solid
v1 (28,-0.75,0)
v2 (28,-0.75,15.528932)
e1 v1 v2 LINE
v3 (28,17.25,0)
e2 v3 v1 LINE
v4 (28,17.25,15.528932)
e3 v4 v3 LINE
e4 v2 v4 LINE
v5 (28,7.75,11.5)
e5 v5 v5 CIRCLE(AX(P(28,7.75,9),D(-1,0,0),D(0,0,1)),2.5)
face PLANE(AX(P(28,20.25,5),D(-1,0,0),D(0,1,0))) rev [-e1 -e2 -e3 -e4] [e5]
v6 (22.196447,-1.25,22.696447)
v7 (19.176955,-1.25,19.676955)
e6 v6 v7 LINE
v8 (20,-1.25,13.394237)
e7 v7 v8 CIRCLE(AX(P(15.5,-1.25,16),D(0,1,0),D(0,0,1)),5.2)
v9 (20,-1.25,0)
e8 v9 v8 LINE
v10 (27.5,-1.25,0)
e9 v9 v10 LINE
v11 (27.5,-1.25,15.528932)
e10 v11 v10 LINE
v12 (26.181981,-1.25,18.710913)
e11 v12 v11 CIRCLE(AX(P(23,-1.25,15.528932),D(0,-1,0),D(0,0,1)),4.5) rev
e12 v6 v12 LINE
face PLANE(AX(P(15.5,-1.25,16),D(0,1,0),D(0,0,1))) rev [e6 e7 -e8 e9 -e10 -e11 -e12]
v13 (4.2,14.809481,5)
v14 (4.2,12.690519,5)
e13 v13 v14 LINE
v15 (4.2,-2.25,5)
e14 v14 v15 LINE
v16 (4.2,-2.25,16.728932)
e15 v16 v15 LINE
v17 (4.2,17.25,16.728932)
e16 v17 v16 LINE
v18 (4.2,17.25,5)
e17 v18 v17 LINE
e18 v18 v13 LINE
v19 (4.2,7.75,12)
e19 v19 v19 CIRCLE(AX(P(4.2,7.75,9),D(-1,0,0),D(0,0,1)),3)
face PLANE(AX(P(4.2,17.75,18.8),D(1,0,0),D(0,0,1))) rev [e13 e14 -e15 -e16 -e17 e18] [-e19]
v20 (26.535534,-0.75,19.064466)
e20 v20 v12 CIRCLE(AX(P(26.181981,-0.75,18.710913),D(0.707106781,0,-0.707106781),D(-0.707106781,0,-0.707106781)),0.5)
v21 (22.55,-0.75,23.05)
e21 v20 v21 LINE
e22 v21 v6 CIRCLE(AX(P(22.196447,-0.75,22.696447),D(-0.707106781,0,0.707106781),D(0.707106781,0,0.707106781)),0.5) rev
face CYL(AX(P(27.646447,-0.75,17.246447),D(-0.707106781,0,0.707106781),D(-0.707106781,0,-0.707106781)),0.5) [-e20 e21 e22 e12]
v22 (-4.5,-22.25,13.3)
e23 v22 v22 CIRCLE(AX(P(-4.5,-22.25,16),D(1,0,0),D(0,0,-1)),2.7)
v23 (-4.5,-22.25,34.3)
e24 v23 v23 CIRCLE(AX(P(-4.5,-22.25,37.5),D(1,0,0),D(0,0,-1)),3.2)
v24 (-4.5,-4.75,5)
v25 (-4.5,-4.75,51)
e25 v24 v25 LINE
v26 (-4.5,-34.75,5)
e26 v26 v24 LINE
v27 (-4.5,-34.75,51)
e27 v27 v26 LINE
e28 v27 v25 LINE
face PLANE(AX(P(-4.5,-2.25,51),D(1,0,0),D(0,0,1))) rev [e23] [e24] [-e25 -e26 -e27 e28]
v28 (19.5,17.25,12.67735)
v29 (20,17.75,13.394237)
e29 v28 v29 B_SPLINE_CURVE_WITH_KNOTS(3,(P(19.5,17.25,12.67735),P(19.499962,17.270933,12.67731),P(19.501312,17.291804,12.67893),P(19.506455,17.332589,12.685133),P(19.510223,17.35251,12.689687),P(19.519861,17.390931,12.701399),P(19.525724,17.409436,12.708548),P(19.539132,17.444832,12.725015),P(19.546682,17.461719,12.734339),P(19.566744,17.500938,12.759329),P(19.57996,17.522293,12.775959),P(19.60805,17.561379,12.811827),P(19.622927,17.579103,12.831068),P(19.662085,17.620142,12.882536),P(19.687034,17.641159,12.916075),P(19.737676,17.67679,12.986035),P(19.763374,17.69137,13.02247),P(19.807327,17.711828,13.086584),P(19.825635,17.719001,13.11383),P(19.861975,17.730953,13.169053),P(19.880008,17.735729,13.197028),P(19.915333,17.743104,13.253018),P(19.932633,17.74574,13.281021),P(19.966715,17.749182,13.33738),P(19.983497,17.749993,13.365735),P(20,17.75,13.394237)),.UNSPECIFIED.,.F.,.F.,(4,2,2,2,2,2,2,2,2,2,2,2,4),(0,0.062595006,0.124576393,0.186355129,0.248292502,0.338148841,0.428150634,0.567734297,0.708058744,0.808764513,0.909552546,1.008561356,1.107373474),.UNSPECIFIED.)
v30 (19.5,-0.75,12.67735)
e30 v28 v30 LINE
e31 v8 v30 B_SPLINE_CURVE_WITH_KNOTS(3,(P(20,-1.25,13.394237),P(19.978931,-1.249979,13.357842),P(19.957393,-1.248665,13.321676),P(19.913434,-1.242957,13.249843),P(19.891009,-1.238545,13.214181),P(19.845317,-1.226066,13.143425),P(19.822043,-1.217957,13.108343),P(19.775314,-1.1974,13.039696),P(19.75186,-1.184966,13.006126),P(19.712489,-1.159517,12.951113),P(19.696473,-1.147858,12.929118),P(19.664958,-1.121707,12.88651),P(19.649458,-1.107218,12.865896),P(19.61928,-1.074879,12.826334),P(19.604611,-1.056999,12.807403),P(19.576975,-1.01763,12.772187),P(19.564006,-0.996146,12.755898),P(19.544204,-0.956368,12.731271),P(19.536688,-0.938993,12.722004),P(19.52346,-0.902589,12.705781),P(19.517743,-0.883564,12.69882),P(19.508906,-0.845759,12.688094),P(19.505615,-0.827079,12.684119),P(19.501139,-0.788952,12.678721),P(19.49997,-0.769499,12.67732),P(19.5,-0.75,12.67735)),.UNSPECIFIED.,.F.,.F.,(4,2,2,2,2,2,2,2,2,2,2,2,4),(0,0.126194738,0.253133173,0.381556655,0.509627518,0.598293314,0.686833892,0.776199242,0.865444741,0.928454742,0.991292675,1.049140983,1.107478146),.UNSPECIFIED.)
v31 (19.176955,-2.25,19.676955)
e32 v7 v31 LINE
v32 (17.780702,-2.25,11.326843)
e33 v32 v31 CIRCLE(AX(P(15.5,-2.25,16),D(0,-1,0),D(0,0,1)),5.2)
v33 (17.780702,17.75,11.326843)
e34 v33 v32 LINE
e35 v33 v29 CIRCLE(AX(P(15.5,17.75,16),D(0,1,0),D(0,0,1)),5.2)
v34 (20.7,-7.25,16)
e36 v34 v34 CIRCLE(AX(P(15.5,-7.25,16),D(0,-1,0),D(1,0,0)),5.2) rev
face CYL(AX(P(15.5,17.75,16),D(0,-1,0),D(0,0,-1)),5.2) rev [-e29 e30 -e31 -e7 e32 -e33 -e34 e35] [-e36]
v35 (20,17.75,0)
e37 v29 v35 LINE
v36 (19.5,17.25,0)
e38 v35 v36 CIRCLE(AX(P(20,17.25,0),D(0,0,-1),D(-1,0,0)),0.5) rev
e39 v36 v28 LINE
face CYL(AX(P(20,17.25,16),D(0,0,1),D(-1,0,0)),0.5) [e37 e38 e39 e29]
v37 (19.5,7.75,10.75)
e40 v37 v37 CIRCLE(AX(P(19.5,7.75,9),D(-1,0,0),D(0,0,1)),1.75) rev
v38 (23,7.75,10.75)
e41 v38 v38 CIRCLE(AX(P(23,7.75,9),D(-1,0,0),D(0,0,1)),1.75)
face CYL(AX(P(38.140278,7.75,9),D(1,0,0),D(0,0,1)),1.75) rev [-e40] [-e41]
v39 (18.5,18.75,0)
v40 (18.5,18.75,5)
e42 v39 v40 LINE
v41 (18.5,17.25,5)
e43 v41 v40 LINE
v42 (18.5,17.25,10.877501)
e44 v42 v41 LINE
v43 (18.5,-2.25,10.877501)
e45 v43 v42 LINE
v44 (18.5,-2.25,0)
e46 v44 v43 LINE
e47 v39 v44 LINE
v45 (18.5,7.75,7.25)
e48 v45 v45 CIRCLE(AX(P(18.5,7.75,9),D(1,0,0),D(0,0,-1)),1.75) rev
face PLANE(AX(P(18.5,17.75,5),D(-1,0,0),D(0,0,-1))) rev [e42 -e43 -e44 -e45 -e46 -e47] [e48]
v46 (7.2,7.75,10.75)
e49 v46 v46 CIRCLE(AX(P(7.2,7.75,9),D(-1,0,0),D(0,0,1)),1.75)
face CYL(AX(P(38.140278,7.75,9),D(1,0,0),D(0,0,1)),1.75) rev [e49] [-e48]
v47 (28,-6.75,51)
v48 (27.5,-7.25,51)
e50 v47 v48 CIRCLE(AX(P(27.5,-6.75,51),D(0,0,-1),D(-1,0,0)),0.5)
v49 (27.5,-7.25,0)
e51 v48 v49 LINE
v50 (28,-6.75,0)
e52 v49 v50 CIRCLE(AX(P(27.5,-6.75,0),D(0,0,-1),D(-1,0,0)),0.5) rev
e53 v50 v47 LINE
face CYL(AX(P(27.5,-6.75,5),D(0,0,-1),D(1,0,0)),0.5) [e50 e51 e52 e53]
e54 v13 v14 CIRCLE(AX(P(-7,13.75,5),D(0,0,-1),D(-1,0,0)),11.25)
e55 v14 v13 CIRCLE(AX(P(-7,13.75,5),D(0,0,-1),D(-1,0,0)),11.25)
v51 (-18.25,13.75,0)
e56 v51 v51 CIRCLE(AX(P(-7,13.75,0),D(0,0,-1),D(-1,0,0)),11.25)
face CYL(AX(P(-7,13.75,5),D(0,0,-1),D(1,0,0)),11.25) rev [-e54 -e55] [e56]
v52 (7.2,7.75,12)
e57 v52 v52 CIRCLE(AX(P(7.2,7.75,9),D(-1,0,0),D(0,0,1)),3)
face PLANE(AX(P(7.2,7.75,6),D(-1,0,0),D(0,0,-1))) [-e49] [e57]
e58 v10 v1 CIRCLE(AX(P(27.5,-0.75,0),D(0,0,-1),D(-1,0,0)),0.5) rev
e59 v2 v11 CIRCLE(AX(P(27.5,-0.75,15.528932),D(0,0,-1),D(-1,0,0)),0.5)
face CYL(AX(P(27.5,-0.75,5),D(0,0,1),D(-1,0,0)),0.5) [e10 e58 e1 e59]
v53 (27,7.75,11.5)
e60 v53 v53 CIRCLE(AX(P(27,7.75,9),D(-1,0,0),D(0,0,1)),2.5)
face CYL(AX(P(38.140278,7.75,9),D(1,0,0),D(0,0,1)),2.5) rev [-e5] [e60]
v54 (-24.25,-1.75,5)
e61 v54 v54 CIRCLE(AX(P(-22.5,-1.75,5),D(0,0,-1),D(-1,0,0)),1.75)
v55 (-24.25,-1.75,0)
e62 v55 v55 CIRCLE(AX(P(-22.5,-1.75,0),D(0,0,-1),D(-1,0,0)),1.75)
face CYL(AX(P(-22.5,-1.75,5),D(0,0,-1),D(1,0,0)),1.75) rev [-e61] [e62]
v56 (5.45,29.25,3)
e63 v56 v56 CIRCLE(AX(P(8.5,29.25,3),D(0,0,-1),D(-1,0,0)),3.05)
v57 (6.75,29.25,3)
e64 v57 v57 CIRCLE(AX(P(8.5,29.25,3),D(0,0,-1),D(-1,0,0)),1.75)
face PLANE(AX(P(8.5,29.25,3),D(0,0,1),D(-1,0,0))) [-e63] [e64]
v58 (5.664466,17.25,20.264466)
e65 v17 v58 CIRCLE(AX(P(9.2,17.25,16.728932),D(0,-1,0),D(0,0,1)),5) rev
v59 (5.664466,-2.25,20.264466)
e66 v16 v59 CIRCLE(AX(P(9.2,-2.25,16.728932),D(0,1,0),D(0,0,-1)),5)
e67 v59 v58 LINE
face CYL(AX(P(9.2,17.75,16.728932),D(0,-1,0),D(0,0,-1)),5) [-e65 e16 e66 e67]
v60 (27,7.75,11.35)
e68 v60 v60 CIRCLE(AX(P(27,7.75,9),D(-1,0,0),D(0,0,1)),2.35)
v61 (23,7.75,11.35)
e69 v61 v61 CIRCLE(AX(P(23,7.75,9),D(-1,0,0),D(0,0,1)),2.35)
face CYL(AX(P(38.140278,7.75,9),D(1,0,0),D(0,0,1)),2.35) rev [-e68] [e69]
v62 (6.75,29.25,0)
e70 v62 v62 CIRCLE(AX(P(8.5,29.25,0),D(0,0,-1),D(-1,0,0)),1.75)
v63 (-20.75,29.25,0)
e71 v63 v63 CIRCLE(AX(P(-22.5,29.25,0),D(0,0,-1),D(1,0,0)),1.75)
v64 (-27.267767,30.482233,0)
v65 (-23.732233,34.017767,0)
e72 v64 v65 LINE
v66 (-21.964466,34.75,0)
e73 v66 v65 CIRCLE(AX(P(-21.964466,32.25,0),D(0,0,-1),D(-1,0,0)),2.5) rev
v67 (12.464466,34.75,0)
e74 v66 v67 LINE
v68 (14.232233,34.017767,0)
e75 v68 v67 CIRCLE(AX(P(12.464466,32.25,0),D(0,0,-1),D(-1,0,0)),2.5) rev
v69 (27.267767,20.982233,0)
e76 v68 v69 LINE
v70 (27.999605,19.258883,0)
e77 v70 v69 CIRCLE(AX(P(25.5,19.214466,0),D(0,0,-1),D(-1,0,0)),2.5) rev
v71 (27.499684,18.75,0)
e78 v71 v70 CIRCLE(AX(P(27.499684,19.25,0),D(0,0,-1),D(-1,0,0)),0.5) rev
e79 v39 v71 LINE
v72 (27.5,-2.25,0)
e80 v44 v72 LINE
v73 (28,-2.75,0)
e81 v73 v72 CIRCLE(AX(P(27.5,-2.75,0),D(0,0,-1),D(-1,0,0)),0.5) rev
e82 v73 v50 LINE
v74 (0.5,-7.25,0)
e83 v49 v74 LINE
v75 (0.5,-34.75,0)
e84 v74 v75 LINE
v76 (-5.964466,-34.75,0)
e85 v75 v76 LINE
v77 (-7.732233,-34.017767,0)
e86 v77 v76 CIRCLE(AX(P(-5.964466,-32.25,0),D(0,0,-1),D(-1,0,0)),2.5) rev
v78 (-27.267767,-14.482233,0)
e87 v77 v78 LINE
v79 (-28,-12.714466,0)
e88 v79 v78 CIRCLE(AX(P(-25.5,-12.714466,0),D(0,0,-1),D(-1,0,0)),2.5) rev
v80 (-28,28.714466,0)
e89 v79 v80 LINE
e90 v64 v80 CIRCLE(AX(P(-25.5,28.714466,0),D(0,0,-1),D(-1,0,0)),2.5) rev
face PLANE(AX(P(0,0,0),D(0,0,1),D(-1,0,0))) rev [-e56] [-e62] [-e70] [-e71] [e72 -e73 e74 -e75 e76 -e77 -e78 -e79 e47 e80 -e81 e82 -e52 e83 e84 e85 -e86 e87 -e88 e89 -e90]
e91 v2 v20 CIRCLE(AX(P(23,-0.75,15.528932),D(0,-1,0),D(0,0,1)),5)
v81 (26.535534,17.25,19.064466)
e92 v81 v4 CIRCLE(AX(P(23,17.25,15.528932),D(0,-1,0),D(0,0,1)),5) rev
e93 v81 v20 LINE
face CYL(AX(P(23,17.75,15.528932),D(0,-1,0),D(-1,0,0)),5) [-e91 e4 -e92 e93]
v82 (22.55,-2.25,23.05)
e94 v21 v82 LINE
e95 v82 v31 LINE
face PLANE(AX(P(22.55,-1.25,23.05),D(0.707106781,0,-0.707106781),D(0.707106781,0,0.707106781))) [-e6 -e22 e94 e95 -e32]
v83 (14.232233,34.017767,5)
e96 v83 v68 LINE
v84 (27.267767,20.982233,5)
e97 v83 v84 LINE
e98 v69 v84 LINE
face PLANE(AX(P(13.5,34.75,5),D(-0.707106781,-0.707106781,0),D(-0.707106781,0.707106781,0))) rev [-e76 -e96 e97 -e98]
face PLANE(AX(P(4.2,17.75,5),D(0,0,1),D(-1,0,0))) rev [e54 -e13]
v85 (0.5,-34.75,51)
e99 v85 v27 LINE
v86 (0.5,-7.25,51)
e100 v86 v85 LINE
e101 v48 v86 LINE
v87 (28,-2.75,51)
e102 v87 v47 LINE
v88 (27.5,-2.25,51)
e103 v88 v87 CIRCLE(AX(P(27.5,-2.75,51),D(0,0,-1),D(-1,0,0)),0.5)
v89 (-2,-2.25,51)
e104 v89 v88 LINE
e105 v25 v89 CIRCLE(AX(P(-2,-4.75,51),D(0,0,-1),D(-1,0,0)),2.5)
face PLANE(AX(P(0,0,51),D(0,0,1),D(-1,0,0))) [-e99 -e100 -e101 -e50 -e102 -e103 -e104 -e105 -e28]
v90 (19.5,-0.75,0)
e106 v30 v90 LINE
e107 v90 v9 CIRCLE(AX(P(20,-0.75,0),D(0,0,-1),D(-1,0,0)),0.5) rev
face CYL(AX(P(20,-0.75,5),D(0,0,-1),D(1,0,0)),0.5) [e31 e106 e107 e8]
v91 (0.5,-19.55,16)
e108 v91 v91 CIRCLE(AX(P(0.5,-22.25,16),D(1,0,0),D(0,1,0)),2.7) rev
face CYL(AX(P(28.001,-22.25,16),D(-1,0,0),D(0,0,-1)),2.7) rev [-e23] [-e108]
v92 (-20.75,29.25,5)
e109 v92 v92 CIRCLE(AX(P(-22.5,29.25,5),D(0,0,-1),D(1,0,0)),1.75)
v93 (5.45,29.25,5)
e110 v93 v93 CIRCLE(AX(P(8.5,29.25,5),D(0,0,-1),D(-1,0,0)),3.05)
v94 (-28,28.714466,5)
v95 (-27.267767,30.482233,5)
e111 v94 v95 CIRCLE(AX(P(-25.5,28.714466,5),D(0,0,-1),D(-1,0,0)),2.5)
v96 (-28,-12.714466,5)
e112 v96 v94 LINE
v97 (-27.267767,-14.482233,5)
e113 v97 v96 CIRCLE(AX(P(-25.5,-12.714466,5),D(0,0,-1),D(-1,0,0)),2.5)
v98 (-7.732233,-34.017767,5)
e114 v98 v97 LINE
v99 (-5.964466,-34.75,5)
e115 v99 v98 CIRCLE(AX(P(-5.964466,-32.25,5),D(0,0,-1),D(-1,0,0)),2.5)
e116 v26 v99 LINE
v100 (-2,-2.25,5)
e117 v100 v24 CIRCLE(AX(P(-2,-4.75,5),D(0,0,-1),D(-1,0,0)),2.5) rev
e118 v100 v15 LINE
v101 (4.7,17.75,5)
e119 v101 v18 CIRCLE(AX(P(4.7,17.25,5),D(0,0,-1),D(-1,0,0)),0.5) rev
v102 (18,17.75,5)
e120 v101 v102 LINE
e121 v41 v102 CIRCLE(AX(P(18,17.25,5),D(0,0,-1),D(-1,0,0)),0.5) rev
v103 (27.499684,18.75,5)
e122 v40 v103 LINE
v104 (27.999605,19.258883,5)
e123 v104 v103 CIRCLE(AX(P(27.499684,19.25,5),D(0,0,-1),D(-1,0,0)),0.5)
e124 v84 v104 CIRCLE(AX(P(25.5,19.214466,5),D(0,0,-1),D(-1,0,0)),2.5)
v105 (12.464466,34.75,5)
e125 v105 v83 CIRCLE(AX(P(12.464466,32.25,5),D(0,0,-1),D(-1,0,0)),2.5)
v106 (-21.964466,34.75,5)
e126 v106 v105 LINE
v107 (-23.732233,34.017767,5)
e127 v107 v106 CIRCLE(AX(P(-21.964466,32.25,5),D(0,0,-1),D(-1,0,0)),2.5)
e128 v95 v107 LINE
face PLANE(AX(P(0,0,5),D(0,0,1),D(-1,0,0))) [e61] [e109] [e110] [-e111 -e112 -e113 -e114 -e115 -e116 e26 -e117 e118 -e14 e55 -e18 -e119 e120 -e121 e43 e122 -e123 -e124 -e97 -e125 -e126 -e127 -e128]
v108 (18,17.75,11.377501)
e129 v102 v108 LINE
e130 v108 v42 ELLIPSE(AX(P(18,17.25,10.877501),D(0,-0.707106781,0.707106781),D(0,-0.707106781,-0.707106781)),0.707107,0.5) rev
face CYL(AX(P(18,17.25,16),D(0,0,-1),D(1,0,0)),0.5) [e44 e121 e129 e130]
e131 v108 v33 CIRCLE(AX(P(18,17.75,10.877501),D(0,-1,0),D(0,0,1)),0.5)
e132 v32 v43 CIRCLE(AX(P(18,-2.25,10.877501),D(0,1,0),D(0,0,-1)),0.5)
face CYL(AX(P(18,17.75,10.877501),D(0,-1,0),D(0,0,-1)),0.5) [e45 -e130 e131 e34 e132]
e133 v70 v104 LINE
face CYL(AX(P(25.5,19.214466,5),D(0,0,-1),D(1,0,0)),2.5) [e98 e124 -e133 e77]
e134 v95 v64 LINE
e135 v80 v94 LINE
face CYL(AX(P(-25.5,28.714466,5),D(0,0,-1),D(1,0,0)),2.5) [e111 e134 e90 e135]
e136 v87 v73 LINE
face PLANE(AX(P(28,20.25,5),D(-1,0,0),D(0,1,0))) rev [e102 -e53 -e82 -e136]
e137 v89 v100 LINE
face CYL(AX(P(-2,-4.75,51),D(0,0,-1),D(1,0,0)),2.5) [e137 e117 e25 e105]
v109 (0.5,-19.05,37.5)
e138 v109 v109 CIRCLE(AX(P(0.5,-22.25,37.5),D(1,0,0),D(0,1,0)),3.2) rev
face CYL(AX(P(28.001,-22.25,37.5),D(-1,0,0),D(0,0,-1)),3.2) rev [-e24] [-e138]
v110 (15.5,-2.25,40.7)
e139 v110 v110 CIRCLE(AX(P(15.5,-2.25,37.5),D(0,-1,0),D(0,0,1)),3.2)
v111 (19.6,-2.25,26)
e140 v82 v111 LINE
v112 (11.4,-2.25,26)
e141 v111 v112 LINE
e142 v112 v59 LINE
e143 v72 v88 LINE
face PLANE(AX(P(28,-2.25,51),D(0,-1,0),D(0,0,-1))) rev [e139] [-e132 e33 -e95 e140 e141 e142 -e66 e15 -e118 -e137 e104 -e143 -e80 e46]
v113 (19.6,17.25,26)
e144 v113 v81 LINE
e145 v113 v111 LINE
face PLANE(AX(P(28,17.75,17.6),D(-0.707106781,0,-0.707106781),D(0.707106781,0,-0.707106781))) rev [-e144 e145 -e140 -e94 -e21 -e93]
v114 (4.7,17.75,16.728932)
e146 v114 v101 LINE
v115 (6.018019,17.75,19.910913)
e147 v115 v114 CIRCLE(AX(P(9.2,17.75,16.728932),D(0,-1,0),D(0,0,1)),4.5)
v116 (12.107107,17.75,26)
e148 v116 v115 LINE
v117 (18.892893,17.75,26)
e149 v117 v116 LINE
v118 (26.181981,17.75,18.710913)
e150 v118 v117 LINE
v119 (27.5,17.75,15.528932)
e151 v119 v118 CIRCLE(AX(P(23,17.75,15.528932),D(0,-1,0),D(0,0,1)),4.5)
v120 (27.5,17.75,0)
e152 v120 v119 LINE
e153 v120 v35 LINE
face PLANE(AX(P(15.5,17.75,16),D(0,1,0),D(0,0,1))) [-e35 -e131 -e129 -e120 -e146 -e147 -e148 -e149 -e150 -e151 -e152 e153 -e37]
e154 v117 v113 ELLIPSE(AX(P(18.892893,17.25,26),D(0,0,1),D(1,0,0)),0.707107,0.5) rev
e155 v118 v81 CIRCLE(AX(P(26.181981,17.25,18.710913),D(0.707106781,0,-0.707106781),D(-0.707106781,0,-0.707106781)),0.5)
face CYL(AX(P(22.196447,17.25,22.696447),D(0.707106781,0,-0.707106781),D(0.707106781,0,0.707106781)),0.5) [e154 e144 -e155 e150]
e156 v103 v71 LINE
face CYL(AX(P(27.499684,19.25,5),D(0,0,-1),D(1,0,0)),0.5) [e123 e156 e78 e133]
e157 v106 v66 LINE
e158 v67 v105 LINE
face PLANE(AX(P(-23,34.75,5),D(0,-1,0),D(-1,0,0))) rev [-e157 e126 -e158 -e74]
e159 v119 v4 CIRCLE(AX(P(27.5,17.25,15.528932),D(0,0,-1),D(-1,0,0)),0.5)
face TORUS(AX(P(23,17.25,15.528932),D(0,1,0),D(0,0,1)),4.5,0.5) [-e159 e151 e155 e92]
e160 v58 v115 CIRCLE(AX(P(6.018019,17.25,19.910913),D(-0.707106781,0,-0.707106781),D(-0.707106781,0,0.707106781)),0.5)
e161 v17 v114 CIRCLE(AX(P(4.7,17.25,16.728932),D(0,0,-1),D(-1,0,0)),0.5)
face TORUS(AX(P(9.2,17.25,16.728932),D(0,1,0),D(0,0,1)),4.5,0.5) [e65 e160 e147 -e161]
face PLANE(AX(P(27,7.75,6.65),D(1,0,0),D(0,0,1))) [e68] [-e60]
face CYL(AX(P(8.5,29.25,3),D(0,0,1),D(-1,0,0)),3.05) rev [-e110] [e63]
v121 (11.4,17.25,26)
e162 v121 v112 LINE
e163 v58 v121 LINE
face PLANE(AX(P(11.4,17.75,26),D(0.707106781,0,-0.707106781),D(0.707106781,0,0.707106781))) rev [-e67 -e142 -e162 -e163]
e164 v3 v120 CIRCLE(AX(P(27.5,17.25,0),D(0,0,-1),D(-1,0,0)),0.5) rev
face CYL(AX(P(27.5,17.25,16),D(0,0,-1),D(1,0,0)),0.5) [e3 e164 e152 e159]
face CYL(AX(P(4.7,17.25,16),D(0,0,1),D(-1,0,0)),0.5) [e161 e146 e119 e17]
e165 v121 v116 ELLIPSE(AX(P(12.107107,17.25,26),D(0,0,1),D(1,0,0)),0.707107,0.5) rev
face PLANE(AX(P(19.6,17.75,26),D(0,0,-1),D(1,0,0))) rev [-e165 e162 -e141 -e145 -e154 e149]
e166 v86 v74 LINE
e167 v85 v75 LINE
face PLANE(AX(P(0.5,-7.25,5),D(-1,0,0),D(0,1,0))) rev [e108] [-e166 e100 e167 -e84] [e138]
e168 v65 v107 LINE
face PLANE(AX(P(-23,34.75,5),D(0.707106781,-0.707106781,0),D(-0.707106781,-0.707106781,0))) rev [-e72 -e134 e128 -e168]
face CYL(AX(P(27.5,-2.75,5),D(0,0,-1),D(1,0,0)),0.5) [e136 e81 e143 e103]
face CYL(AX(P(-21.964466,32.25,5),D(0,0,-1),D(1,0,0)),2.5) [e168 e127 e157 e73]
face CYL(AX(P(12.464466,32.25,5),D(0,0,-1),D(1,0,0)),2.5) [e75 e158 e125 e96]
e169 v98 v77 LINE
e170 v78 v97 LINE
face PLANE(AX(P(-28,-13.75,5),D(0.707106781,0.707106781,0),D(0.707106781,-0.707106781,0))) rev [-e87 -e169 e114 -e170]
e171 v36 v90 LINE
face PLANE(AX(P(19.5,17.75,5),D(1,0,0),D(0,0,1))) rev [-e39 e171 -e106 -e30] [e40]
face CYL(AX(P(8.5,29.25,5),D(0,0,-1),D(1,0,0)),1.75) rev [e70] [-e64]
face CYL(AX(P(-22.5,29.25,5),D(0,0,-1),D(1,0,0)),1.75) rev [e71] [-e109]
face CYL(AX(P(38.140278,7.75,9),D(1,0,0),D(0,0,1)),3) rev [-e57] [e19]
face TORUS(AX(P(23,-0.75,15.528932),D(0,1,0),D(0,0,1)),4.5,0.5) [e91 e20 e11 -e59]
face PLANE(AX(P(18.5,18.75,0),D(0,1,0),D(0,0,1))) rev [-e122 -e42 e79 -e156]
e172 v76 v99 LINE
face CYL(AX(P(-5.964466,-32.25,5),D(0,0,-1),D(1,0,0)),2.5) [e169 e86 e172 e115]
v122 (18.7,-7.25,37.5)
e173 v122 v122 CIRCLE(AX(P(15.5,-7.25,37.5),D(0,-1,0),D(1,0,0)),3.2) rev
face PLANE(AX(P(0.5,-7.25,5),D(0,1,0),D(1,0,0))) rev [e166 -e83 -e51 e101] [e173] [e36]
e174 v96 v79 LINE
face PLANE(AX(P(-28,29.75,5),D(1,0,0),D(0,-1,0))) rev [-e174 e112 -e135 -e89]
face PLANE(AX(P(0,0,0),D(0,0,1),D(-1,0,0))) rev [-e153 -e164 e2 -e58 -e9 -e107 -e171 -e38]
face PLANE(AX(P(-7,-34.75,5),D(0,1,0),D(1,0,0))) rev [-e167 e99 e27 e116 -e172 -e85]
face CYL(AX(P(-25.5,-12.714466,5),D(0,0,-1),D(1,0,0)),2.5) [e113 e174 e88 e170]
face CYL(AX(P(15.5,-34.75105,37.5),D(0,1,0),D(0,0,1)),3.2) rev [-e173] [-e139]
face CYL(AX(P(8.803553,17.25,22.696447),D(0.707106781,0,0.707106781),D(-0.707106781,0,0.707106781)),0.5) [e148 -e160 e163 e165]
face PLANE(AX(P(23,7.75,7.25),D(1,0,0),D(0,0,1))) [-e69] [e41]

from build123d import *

# Parameters (mm, degrees)
SKETCH1_R           = 11.25
SKETCH1_R_2         = 1.75
BOSS_EXTRUDE1_DEPTH = 5
BOSS_EXTRUDE2_DEPTH = 46
BOSS_EXTRUDE3_DEPTH = 20
CUT_EXTRUDE1_DEPTH  = 1
CUT_EXTRUDE2_DEPTH  = 65.090268372
CUT_EXTRUDE3_REACH  = 71.748
SKETCH6_R           = 2.7
SKETCH6_R_2         = 3.2
CUT_EXTRUDE4_REACH  = 70.949
SKETCH7_R           = 5.2
SKETCH7_R_2         = 3.2
SKETCH8_R           = 3.05
CUT_EXTRUDE5_DEPTH  = 2
FILLET1_R           = 2.5
FILLET2_R           = 5
FILLET3_R           = 0.5


with BuildPart() as part:
    # Sketch1 → Boss-Extrude1 (new body)
    with BuildSketch(Plane.XY):
        Polygon((-13.5, 34.75), (-28, 20.25), (-28, -7.25), (-0.5, -7.25), (-0.5, -34.75), (7, -34.75), (28, -13.75), (28, 29.75), (23, 34.75), align=None)
        with Locations((7, 13.75)):
            Circle(SKETCH1_R, mode=Mode.SUBTRACT)
        with Locations((-8.5, 29.25)):
            Circle(SKETCH1_R_2, mode=Mode.SUBTRACT)
        with Locations(Location((22.5, 29.25, 0), (0, 0, 180))):
            Circle(SKETCH1_R_2, mode=Mode.SUBTRACT)
        with Locations((22.5, -1.75)):
            Circle(SKETCH1_R_2, mode=Mode.SUBTRACT)
    extrude(amount=BOSS_EXTRUDE1_DEPTH)

    # Sketch2 → Boss-Extrude2 (add)
    with BuildSketch(Plane.XY.offset(5)):
        Polygon((-28, -7.25), (-0.5, -7.25), (-0.5, -34.75), (4.5, -34.75), (4.5, -2.25), (-28, -2.25), align=None)
    extrude(amount=BOSS_EXTRUDE2_DEPTH)

    # Sketch3 → Boss-Extrude3 (add)
    with BuildSketch(Plane(origin=(0, -2.25, 0), x_dir=(1, 0, 0), z_dir=(0, 1, 0))):
        with BuildLine():
            Line((-28, -5), (-28, -17.6))
            Line((-28, -17.6), (-19.6, -26))
            Line((-19.6, -26), (-11.4, -26))
            Line((-11.4, -26), (-4.2, -18.8))
            Line((-4.2, -18.8), (-4.2, -5))
            Line((-4.2, -5), (-18.5, -5))
            Line((-18.5, -5), (-18.5, -11.752647884))
            ThreePointArc((-18.5, -11.752647884), (-11.96959369, -19.81788309), (-19.5, -12.677350455))
            Line((-19.5, -12.677350455), (-19.5, -5))
            Line((-19.5, -5), (-28, -5))
        make_face()
    extrude(amount=BOSS_EXTRUDE3_DEPTH)

    # Sketch4 → Cut-Extrude1 (cut)
    with BuildSketch(Plane(origin=(0, -2.25, 0), x_dir=(1, 0, 0), z_dir=(0, 1, 0))):
        with BuildLine():
            Line((-28, -17.6), (-28, 0))
            Line((-28, 0), (-18.5, 0))
            Line((-18.5, 0), (-18.5, -11.752647884))
            ThreePointArc((-18.5, -11.752647884), (-20.681128714, -15.55738815), (-19.176955262, -19.676955262))
            Line((-19.176955262, -19.676955262), (-22.55, -23.05))
            Line((-22.55, -23.05), (-28, -17.6))
        make_face()
    extrude(amount=CUT_EXTRUDE1_DEPTH, mode=Mode.SUBTRACT)

    # Sketch5 → Cut-Extrude2 (cut, through all)
    with BuildSketch(Plane.XY.offset(5)):
        Polygon((-19.5, 17.75), (-28, 17.75), (-28, 18.75), (-18.5, 18.75), (-18.5, -1.25), (-19.5, -1.25), align=None)
    extrude(amount=-CUT_EXTRUDE2_DEPTH, mode=Mode.SUBTRACT)

    # Sketch6 → Cut-Extrude3 (cut, up to next)
    with BuildSketch(Plane(origin=(4.5, 0, 0), x_dir=(0, 0, -1), z_dir=(1, 0, 0)), mode=Mode.PRIVATE) as cut_extrude3_sk1:
        with Locations((-16, -22.25)):
            Circle(SKETCH6_R)
    cut_extrude3_tool1 = extrude(cut_extrude3_sk1.sketch, amount=-CUT_EXTRUDE3_REACH, mode=Mode.PRIVATE) & part.part
    # Sketch6 → Cut-Extrude3 (cut, up to next)
    with BuildSketch(Plane(origin=(4.5, 0, 0), x_dir=(0, 0, -1), z_dir=(1, 0, 0)), mode=Mode.PRIVATE) as cut_extrude3_sk2:
        with Locations((-37.5, -22.25)):
            Circle(SKETCH6_R_2)
    cut_extrude3_tool2 = extrude(cut_extrude3_sk2.sketch, amount=-CUT_EXTRUDE3_REACH, mode=Mode.PRIVATE) & part.part
    add(cut_extrude3_tool1.solids().sort_by_distance((4.5, -22.25, 16))[0], mode=Mode.SUBTRACT)
    add(cut_extrude3_tool2.solids().sort_by_distance((4.5, -22.25, 37.5))[0], mode=Mode.SUBTRACT)

    # Sketch7 → Cut-Extrude4 (cut, up to next)
    with BuildSketch(Plane(origin=(0, -2.25, 0), x_dir=(1, 0, 0), z_dir=(0, 1, 0)), mode=Mode.PRIVATE) as cut_extrude4_sk1:
        with Locations(Location((-15.5, -16, 0), (0, 0, 125.234417985))):
            Circle(SKETCH7_R)
    cut_extrude4_tool1 = extrude(cut_extrude4_sk1.sketch, amount=-CUT_EXTRUDE4_REACH, mode=Mode.PRIVATE) & part.part
    # Sketch7 → Cut-Extrude4 (cut, up to next)
    with BuildSketch(Plane(origin=(0, -2.25, 0), x_dir=(1, 0, 0), z_dir=(0, 1, 0)), mode=Mode.PRIVATE) as cut_extrude4_sk2:
        with Locations(Location((-15.5, -37.5, 0), (0, 0, 270))):
            Circle(SKETCH7_R_2)
    cut_extrude4_tool2 = extrude(cut_extrude4_sk2.sketch, amount=-CUT_EXTRUDE4_REACH, mode=Mode.PRIVATE) & part.part
    add(cut_extrude4_tool1.solids().sort_by_distance((-15.5, -2.25, 16))[0], mode=Mode.SUBTRACT)
    add(cut_extrude4_tool2.solids().sort_by_distance((-15.5, -2.25, 37.5))[0], mode=Mode.SUBTRACT)

    # Sketch8 → Cut-Extrude5 (cut)
    with BuildSketch(Plane.XY.offset(5)):
        with Locations((-8.5, 29.25)):
            Circle(SKETCH8_R)
    extrude(amount=-CUT_EXTRUDE5_DEPTH, mode=Mode.SUBTRACT)

    # Sketch9 → Cut-Revolve1 (revolve, cut)
    with BuildSketch(Plane(origin=(0, 7.75, 0), x_dir=(1, 0, 0), z_dir=(0, 1, 0)), mode=Mode.PRIVATE) as cut_revolve1_sk:
        Polygon((-4.2, -9), (-4.2, -6), (-7.2, -6), (-7.2, -7.25), (-23, -7.25), (-23, -6.65), (-27, -6.65), (-27, -6.5), (-28, -6.5), (-28, -9), align=None)
    revolve(cut_revolve1_sk.sketch.rotate(Axis((-38.14027768, 7.75, 9), (1, 0, 0)), 180), axis=Axis((-38.14027768, 7.75, 9), (1, 0, 0)), mode=Mode.SUBTRACT)

    # Fillet1
    fillet1_edges = [part.edges().sort_by_distance(p)[0] for p in [
        (4.5, -2.25, 28),
        (-28, 20.25, 2.5),
        (7, -34.75, 2.5),
        (28, -13.75, 2.5),
        (28, 29.75, 2.5),
        (23, 34.75, 2.5),
        (-13.5, 34.75, 2.5),
    ]]
    fillet(fillet1_edges, radius=FILLET1_R)

    # Fillet2
    fillet2_edges = [part.edges().sort_by_distance(p)[0] for p in [
        (-28, 8.25, 17.6),
        (-4.2, 7.75, 18.8),
    ]]
    fillet(fillet2_edges, radius=FILLET2_R)

    # Fillet3
    # the kernel refuses this fillet: 0.5 mm, written as the material it takes off along each edge
    with BuildSketch(Plane(origin=(-28, -1.25, 15.528932188), x_dir=(1, 0, 0), z_dir=(0, 0, -1)), Plane(origin=(-28, 17.75, -1.25), x_dir=(1, 0, 0), z_dir=(0, 0, 1))) as fillet3_piece_1:
        with BuildLine():
            CenterArc((FILLET3_R, -FILLET3_R), FILLET3_R, 90, 90)
            Line((0, -FILLET3_R), (0, 0))
            Line((0, 0), (FILLET3_R, 0))
        make_face()
    extrude(amount=16.778932188, mode=Mode.SUBTRACT)
    with BuildSketch(Plane(origin=(-28, 18.75, 6.272209074), x_dir=(0.0007754462768724465, 0.9999996993414906, 0), z_dir=(0, 0, -1))) as fillet3_piece_2:
        with BuildLine():
            CenterArc((0.500387818, 0.499927816), FILLET3_R, 179.955570197, 91.018024984)
            Line((0.000387968, 0.500315539), (-0.049612017, 0.500354311))
            Line((-0.049612017, 0.500354311), (-0.049999985, 3.8772e-05))
            Line((-0.049999985, 3.8772e-05), (-3.8772e-05, -0.049999985))
            ThreePointArc((-3.8772e-05, -0.049999985), (0.464427182, -0.050360153), (0.509733211, -0.049992782))
            Line((0.509733211, -0.049992782), (0.508883629, 0))
        make_face()
    extrude(amount=7.544418147, mode=Mode.SUBTRACT)
    with BuildSketch(Plane(origin=(-28, -7.25, -1.25), x_dir=(0, 1, 0), z_dir=(0, 0, 1))) as fillet3_piece_3:
        with BuildLine():
            CenterArc((FILLET3_R, -FILLET3_R), FILLET3_R, 90, 90)
            Line((0, -FILLET3_R), (0, 0))
            Line((0, 0), (FILLET3_R, 0))
        make_face()
    extrude(amount=53.5, mode=Mode.SUBTRACT)
    with BuildSketch(Plane(origin=(-26.535533906, 17.75, 19.064466094), x_dir=(0, -1, 0), z_dir=(0.707106781186549, 0, 0.707106781186546))) as fillet3_piece_4:
        with BuildLine():
            CenterArc((FILLET3_R, FILLET3_R), FILLET3_R, 180, 90)
            Line((0, FILLET3_R), (0, 0))
            Line((0, 0), (FILLET3_R, 0))
        make_face()
    extrude(amount=11.058326112, mode=Mode.SUBTRACT)
    with BuildSketch(Plane(origin=(-22.55, -1.25, 23.05), x_dir=(0, 1, 0), z_dir=(-0.7071067811865489, 0, -0.7071067811865461))) as fillet3_piece_5:
        with BuildLine():
            CenterArc((FILLET3_R, FILLET3_R), FILLET3_R, 180, 90)
            Line((0, FILLET3_R), (0, 0))
            Line((0, 0), (FILLET3_R, 0))
        make_face()
    extrude(amount=5.636396103, mode=Mode.SUBTRACT)
    with BuildSketch(Plane(origin=(-23, -1.25, 15.528932188), x_dir=(-0.7071067811865456, 0, 0.7071067811865495), z_dir=(0.7071067811865495, 0, 0.7071067811865456))) as fillet3_piece_6:
        with BuildLine():
            CenterArc((5 - FILLET3_R, -FILLET3_R), FILLET3_R, 0, 90)
            Line((5, -FILLET3_R), (5, 0))
            Line((5, 0), (5 - FILLET3_R, 0))
        make_face()
    revolve(axis=Axis((-23, -1.25, 15.528932188), (0, -1, 0)), revolution_arc=45, mode=Mode.SUBTRACT)
    with BuildSketch(Plane(origin=(-4.2, 17.75, 16.728932188), x_dir=(0, -1, 0), z_dir=(0, 0, -1))) as fillet3_piece_7:
        with BuildLine():
            CenterArc((FILLET3_R, FILLET3_R), FILLET3_R, 180, 90)
            Line((0, FILLET3_R), (0, 0))
            Line((0, 0), (FILLET3_R, 0))
        make_face()
    extrude(amount=11.728932188, mode=Mode.SUBTRACT)
    with BuildSketch(Plane(origin=(-9.2, 17.75, 16.728932188), x_dir=(1, 0, 0), z_dir=(0, 0, -1))) as fillet3_piece_8:
        with BuildLine():
            CenterArc((5 - FILLET3_R, FILLET3_R), FILLET3_R, 270, 90)
            Line((5 - FILLET3_R, 0), (5, 0))
            Line((5, 0), (5, FILLET3_R))
        make_face()
    revolve(axis=Axis((-9.2, 17.75, 16.728932188), (0, -1, 0)), revolution_arc=45, mode=Mode.SUBTRACT)
    with BuildSketch(Plane(origin=(-23, 17.75, 15.528932188), x_dir=(-0.7071067811865456, 0, 0.7071067811865495), z_dir=(0.7071067811865495, 0, 0.7071067811865456))) as fillet3_piece_9:
        with BuildLine():
            CenterArc((5 - FILLET3_R, FILLET3_R), FILLET3_R, 270, 90)
            Line((5, FILLET3_R), (5, 0))
            Line((5, 0), (5 - FILLET3_R, 0))
        make_face()
    revolve(axis=Axis((-23, 17.75, 15.528932188), (0, -1, 0)), revolution_arc=45, mode=Mode.SUBTRACT)
    with BuildSketch(Plane(origin=(-28, -2.25, 52.25), x_dir=(1, 0, 0), z_dir=(0, 0, -1))) as fillet3_piece_10:
        with BuildLine():
            CenterArc((FILLET3_R, FILLET3_R), FILLET3_R, 180, 90)
            Line((0, FILLET3_R), (0, 0))
            Line((0, 0), (FILLET3_R, 0))
        make_face()
    extrude(amount=53.5, mode=Mode.SUBTRACT)
    with BuildSketch(Plane(origin=(-18.5, -2.25, 11.752647884), x_dir=(0, 0, -1), z_dir=(0, 1, 0))) as fillet3_piece_11:
        with BuildLine():
            CenterArc((0.875147274, -0.5), FILLET3_R, 90, 116.014366)
            ThreePointArc((0.425805222, -0.719298246), (0.22737913, -0.351079413), (0, 0))
            Line((0, 0), (0.875147274, 0))
        make_face()
    extrude(amount=22.187868184, mode=Mode.SUBTRACT)
    with BuildSketch(Plane(origin=(-12.283883476, 17.75, 26.883883476), x_dir=(0, -1, 0), z_dir=(0.7071067811865485, 0, -0.7071067811865467))) as fillet3_piece_12:
        with BuildLine():
            CenterArc((FILLET3_R, FILLET3_R), FILLET3_R, 180, 90)
            Line((0, FILLET3_R), (0, 0))
            Line((0, 0), (FILLET3_R, 0))
        make_face()
    extrude(amount=9.361269837, mode=Mode.SUBTRACT)
    with BuildSketch(Plane(origin=(-18.5, 17.75, 5), x_dir=(0, -1, 0), z_dir=(0, 0, 1))) as fillet3_piece_13:
        with BuildLine():
            CenterArc((FILLET3_R, FILLET3_R), FILLET3_R, 180, 90)
            Line((0, FILLET3_R), (0, 0))
            Line((0, 0), (FILLET3_R, 0))
        make_face()
    extrude(amount=8.002647884, mode=Mode.SUBTRACT)
    with BuildSketch(Plane(origin=(-19.5, 17.75, 13.927350455), x_dir=(-1, 0, 0), z_dir=(0, 0, -1))) as fillet3_piece_14:
        with BuildLine():
            CenterArc((FILLET3_R, -FILLET3_R), FILLET3_R, 90, 90)
            Line((0, -FILLET3_R), (0, 0))
            Line((0, 0), (FILLET3_R, 0))
        make_face()
    extrude(amount=15.177350455, mode=Mode.SUBTRACT)
    with BuildSketch(Plane(origin=(-19.5, -1.25, 13.927350455), x_dir=(-1, 0, 0), z_dir=(0, 0, -1))) as fillet3_piece_15:
        with BuildLine():
            CenterArc((FILLET3_R, FILLET3_R), FILLET3_R, 180, 90)
            Line((0, FILLET3_R), (0, 0))
            Line((0, 0), (FILLET3_R, 0))
        make_face()
    extrude(amount=15.177350455, mode=Mode.SUBTRACT)


with BuildPart() as body_2:
    # Mirror1: mirrored copy
    add(part.part.mirror(Plane(origin=(0, 0, 0), x_dir=(0, 0, 1), z_dir=(1, 0, 0))))


solid = body_2.part
